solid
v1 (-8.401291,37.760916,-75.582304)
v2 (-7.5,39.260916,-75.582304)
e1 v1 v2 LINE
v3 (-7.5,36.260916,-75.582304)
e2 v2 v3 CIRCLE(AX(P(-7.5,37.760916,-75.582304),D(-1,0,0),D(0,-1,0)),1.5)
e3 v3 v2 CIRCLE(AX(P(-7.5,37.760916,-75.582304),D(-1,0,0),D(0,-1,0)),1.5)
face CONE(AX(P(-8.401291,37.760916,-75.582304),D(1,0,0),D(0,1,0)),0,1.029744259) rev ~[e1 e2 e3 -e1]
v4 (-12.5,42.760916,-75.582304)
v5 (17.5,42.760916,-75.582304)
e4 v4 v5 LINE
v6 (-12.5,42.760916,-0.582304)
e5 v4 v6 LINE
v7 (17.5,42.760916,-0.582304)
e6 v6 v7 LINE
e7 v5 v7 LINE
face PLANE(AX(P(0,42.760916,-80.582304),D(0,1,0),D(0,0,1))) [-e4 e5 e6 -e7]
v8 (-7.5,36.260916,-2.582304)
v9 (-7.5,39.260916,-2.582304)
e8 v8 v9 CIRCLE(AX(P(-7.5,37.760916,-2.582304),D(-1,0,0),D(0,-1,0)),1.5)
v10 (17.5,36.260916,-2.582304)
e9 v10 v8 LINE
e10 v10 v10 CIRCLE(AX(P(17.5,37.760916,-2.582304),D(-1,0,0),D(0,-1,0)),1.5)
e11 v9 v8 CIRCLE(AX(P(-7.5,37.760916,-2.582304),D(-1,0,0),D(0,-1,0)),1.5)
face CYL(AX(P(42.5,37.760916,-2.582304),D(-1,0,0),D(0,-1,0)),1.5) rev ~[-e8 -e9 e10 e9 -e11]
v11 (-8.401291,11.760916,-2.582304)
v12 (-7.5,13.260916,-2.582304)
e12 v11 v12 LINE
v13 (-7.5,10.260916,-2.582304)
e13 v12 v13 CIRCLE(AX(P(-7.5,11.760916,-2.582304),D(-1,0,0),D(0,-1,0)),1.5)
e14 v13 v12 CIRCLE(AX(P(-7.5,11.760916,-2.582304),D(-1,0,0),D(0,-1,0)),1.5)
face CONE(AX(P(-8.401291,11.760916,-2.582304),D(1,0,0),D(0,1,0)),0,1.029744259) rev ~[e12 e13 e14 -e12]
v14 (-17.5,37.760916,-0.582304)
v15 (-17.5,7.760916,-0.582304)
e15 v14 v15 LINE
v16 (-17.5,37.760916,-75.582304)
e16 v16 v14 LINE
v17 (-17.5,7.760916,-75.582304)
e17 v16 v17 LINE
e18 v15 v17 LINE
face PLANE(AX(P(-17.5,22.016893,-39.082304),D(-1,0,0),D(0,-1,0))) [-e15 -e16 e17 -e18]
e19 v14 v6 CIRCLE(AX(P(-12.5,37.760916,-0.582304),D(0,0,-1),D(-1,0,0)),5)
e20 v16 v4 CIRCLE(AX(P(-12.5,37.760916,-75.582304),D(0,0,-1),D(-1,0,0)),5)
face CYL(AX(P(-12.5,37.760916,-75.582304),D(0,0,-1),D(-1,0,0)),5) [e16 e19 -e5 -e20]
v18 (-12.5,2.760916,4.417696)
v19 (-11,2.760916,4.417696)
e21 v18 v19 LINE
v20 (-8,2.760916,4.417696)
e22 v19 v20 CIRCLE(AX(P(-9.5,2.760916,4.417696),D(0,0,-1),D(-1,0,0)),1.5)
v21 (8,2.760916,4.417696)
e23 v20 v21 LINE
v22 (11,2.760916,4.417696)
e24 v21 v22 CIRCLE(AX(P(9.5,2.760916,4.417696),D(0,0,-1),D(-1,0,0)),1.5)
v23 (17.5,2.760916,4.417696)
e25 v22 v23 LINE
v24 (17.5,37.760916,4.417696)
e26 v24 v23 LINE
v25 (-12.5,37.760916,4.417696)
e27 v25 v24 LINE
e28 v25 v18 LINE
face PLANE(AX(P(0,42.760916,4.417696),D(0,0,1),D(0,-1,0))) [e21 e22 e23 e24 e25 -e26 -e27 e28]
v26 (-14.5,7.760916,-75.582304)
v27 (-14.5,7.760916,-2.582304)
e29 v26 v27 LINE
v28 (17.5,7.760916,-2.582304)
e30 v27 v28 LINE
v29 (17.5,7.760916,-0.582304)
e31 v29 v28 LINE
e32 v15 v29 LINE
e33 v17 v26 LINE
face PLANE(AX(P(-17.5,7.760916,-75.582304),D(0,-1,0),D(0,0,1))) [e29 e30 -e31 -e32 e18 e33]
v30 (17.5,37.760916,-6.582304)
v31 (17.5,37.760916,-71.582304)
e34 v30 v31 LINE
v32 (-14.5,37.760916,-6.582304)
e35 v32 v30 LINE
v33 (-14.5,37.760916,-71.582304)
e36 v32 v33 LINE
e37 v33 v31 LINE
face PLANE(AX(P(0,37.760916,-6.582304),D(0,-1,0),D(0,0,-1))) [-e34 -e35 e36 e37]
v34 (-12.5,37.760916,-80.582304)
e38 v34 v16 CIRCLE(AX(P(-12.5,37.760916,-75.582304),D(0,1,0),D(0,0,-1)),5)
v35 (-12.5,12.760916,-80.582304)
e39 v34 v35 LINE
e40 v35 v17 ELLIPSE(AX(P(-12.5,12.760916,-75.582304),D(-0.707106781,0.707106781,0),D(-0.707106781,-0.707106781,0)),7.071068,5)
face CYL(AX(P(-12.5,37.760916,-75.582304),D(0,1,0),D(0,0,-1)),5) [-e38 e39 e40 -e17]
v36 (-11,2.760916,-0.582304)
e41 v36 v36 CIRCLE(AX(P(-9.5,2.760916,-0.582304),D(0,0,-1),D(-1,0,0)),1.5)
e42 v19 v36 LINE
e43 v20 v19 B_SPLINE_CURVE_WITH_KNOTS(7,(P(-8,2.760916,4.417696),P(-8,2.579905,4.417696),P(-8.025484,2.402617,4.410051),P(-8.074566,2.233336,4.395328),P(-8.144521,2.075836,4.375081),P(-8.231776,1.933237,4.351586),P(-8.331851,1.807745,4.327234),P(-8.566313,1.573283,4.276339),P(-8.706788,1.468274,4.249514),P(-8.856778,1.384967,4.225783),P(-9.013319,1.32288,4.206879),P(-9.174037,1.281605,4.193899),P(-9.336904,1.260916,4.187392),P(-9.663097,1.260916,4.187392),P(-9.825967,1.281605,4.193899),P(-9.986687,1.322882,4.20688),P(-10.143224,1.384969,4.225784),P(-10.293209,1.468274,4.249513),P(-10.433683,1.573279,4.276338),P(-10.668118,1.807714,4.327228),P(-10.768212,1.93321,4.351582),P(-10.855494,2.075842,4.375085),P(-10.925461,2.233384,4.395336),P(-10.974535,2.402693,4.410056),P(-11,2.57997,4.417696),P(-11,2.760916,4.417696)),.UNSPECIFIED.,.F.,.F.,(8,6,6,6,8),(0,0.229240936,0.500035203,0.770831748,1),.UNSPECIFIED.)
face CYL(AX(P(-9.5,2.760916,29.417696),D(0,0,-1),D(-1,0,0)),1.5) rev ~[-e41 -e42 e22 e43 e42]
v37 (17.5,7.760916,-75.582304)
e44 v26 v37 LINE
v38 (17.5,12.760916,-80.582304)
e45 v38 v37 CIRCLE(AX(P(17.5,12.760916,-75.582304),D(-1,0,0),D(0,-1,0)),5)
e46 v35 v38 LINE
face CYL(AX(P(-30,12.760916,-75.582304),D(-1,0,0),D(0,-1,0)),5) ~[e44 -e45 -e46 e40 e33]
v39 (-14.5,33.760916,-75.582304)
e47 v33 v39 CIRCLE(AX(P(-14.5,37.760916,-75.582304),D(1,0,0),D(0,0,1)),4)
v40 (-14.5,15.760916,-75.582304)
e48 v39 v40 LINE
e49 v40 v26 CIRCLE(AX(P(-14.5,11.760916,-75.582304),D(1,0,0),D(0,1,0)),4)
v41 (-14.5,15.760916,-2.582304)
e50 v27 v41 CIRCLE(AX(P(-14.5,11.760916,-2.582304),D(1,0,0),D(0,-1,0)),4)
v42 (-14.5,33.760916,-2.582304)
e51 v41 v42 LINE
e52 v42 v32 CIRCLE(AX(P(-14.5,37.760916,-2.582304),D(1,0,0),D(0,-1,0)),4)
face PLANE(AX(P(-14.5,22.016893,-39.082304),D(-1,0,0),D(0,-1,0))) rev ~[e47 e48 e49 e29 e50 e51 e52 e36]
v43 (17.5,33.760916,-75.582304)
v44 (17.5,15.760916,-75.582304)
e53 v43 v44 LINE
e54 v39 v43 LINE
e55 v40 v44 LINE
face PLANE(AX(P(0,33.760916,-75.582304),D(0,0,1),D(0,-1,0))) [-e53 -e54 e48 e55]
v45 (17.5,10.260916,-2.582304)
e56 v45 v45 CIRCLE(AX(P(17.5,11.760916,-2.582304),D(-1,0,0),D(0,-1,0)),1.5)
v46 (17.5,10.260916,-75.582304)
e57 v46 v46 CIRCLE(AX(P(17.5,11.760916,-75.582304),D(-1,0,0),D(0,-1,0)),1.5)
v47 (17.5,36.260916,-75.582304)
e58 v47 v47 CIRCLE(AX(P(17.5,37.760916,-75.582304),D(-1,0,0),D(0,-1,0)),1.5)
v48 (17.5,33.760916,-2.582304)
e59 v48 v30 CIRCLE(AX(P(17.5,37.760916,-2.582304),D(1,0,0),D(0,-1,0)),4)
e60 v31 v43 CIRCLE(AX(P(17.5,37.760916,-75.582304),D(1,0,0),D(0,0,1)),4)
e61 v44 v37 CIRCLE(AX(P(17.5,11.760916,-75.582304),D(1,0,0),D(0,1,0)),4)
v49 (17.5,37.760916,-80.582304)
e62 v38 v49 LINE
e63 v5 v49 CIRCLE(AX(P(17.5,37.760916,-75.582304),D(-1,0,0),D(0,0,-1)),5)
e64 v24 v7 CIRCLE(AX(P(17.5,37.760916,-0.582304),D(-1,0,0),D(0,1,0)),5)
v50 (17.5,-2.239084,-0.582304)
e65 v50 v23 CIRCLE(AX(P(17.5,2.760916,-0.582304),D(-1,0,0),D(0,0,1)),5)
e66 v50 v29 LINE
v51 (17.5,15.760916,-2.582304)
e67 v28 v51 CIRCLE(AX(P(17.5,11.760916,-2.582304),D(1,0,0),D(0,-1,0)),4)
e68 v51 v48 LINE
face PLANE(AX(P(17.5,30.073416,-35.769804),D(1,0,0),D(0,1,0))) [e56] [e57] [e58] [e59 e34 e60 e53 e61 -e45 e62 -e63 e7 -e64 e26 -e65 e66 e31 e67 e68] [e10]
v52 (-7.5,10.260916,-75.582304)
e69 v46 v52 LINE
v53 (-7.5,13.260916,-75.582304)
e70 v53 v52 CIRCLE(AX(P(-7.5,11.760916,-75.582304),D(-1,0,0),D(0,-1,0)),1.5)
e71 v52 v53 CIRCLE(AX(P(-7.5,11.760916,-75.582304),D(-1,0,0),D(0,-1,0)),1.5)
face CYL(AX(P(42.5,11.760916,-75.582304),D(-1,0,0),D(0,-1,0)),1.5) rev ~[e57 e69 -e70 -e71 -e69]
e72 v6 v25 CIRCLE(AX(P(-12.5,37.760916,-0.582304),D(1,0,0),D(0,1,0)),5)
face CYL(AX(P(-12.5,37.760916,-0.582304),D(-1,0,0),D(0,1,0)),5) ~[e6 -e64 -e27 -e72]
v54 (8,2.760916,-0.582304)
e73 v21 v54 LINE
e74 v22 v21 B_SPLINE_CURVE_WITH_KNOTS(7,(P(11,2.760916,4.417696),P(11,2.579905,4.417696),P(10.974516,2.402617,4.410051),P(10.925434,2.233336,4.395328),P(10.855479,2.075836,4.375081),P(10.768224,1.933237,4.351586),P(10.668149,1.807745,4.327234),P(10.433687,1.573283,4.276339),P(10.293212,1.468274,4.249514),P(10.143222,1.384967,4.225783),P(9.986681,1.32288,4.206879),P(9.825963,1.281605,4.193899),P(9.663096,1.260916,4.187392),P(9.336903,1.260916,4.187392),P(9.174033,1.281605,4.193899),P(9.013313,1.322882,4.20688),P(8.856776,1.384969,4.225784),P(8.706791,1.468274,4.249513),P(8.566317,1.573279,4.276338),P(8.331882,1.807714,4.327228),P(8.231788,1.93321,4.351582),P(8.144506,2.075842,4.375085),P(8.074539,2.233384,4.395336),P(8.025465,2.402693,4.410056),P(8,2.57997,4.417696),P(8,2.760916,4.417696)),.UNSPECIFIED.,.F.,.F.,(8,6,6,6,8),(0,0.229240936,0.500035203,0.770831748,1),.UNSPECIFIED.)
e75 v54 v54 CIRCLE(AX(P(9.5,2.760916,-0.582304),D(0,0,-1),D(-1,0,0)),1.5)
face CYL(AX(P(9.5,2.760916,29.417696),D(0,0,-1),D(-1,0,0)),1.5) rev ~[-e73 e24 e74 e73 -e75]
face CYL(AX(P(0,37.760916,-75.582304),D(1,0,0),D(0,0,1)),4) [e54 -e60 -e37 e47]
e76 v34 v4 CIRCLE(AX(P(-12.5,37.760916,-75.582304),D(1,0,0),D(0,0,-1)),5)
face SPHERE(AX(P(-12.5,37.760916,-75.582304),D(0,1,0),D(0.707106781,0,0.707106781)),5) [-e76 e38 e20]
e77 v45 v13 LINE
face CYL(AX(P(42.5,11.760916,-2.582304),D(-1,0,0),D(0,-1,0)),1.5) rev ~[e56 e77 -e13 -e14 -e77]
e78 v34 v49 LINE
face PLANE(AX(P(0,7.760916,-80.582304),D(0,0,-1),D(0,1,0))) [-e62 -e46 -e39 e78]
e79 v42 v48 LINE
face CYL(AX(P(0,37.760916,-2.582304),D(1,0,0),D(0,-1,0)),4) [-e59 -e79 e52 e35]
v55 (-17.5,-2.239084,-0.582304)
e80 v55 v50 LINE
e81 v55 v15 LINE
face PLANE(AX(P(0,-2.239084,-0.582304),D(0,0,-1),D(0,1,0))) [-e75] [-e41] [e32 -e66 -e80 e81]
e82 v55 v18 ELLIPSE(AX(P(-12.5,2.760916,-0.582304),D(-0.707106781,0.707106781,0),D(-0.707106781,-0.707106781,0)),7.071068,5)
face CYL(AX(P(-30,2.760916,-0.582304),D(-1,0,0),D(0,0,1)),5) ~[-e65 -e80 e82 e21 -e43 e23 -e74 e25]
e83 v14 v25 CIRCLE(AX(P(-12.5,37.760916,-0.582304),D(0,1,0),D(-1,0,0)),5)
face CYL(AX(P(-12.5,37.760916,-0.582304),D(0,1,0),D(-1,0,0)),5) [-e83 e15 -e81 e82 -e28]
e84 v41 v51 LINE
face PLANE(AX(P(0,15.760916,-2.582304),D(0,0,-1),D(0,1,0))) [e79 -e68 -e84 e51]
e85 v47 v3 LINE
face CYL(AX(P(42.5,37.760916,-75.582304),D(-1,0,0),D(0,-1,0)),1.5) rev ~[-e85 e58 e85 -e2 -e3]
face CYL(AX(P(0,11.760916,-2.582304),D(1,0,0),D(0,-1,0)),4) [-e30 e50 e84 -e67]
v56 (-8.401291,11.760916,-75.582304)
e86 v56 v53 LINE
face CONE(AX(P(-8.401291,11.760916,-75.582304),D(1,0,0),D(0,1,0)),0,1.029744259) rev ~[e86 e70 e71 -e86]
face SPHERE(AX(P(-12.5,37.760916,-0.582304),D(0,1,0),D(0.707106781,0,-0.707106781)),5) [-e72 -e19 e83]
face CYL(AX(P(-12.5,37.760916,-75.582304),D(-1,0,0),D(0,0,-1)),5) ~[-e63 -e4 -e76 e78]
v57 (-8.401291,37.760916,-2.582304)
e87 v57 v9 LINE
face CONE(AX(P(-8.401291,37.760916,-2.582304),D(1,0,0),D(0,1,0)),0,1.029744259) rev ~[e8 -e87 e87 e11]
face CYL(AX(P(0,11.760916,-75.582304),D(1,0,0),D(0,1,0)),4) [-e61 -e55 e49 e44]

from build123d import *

# Parameters (mm, degrees)
F1_DEPTH     = 17.5
F3_DEPTH     = 3
F5_D         = 3
F5_DEPTH     = 25
F5_TIP       = 0.9012909285
F7_D         = 3
F7_DEPTH     = 25
F7_TIP       = 0.9012909285
F8_T1_DEPTH  = 60
F8_T3_DEPTH  = 42.5
F8_T5_DEPTH  = 75
F8_T7_DEPTH  = 42.5
F8_T9_DEPTH  = 52.5
F8_S13_W     = 5
F8_S13_H     = 5
F8_T14_DEPTH = 5
F8_S19_W     = 5
F8_S19_H     = 5
F8_T20_DEPTH = 5


# Not quite as in the source:
# - a fillet or chamfer that OpenCascade refuses, or shapes differently, is made with other operations: its cross-section is extruded or revolved along the edge and cut away or added


with BuildPart() as f1:
    # F0 (on Right) → F1 (new body, symmetric)
    with BuildSketch(Plane.YZ):
        Polygon((-2.2390836586, 4.4176964641), (-2.2390836586, -0.5823035359), (7.7609163414, -0.5823035359), (7.7609163414, -2.5823035359), (15.7609163414, -2.5823035359), (33.7609163414, -2.5823035359), (37.7609163414, -2.5823035359), (37.7609163414, -6.5823035359), (37.7609163414, -71.5823035359), (37.7609163414, -75.5823035359), (33.7609163414, -75.5823035359), (15.7609163414, -75.5823035359), (7.7609163414, -75.5823035359), (7.7609163414, -80.5823035359), (42.7609163414, -80.5823035359), (42.7609163414, 4.4176964641), align=None)
        with BuildLine():
            Line((15.7609163414, -2.5823035359), (7.7609163414, -2.5823035359))
            ThreePointArc((7.7609163414, -2.5823035359), (11.7609163414, -6.5823035359), (15.7609163414, -2.5823035359))
        make_face()
        with BuildLine():
            Line((37.7609163414, -2.5823035359), (33.7609163414, -2.5823035359))
            ThreePointArc((33.7609163414, -2.5823035359), (34.9324892166, -5.4107306607), (37.7609163414, -6.5823035359))
            Line((37.7609163414, -6.5823035359), (37.7609163414, -2.5823035359))
        make_face()
        with BuildLine():
            ThreePointArc((15.7609163414, -75.5823035359), (11.7609163414, -71.5823035359), (7.7609163414, -75.5823035359))
            Line((7.7609163414, -75.5823035359), (15.7609163414, -75.5823035359))
        make_face()
        with BuildLine():
            Line((37.7609163414, -75.5823035359), (37.7609163414, -71.5823035359))
            ThreePointArc((37.7609163414, -71.5823035359), (34.9324892166, -72.7538764112), (33.7609163414, -75.5823035359))
            Line((33.7609163414, -75.5823035359), (37.7609163414, -75.5823035359))
        make_face()
    extrude(amount=F1_DEPTH, both=True)

    # F2 (on face) → F3 (join)
    with BuildSketch(Plane(origin=(-17.5, 0, 0), x_dir=(0, -1, 0), z_dir=(-1, 0, 0))):
        with BuildLine():
            Line((-7.7609163414, -75.5823035359), (-7.7609163414, -2.5823035359))
            ThreePointArc((-7.7609163414, -2.5823035359), (-11.7609163414, -6.5823035359), (-15.7609163414, -2.5823035359))
            Line((-15.7609163414, -2.5823035359), (-33.7609163414, -2.5823035359))
            ThreePointArc((-33.7609163414, -2.5823035359), (-34.9324892166, -5.4107306607), (-37.7609163414, -6.5823035359))
            Line((-37.7609163414, -6.5823035359), (-37.7609163414, -71.5823035359))
            ThreePointArc((-37.7609163414, -71.5823035359), (-34.9324892166, -72.7538764112), (-33.7609163414, -75.5823035359))
            Line((-33.7609163414, -75.5823035359), (-15.7609163414, -75.5823035359))
            ThreePointArc((-15.7609163414, -75.5823035359), (-11.7609163414, -71.5823035359), (-7.7609163414, -75.5823035359))
        make_face()
    extrude(amount=-F3_DEPTH)

    # F5
    with Locations(Plane.YZ.offset(17.5)):
        with Locations((11.7609163414, -2.5823035359), (37.7609163414, -2.5823035359), (37.7609163414, -75.5823035359), (11.7609163414, -75.5823035359)):
            Hole(F5_D / 2, depth=F5_DEPTH)
            with Locations((0, 0, -(F5_DEPTH + F5_TIP / 2))):  # 118° drill point
                Cone(0, F5_D / 2, F5_TIP, mode=Mode.SUBTRACT)

    # F7
    with Locations(Plane.XY.offset(4.4176964641)):
        with Locations((-9.5, 2.7609163414), (9.5, 2.7609163414)):
            Hole(F7_D / 2, depth=F7_DEPTH)
            with Locations((0, 0, -(F7_DEPTH + F7_TIP / 2))):  # 118° drill point
                Cone(0, F7_D / 2, F7_TIP, mode=Mode.SUBTRACT)

    # F8: fillet of radius 5 on 7 edges, made by hand

    # F8_s2 → F8_t1 (cut)
    with BuildSketch(Plane.YZ.offset(-30)):
        with BuildLine():
            ThreePointArc((2.7609163414, 4.4176964641), (-0.7746175645, 2.95323037), (-2.2390836586, -0.5823035359))
            Line((-2.2390836586, -0.5823035359), (-2.2390836586, 4.4176964641))
            Line((-2.2390836586, 4.4176964641), (2.7609163414, 4.4176964641))
        make_face()
        with BuildLine():
            ThreePointArc((7.7609163414, -75.5823035359), (9.2253824355, -79.1178374419), (12.7609163414, -80.5823035359))
            Line((12.7609163414, -80.5823035359), (7.7609163414, -80.5823035359))
            Line((7.7609163414, -80.5823035359), (7.7609163414, -75.5823035359))
        make_face()
    extrude(amount=F8_T1_DEPTH, mode=Mode.SUBTRACT)

    # F8_s4 → F8_t3 (cut)
    with BuildSketch(Plane.YZ.offset(-12.5)):
        with BuildLine():
            ThreePointArc((42.7609163414, -0.5823035359), (41.2964502473, 2.95323037), (37.7609163414, 4.4176964641))
            Line((37.7609163414, 4.4176964641), (42.7609163414, 4.4176964641))
            Line((42.7609163414, 4.4176964641), (42.7609163414, -0.5823035359))
        make_face()
        with BuildLine():
            ThreePointArc((37.7609163414, -80.5823035359), (41.2964502473, -79.1178374419), (42.7609163414, -75.5823035359))
            Line((42.7609163414, -75.5823035359), (42.7609163414, -80.5823035359))
            Line((42.7609163414, -80.5823035359), (37.7609163414, -80.5823035359))
        make_face()
    extrude(amount=F8_T3_DEPTH, mode=Mode.SUBTRACT)

    # F8_s6 → F8_t5 (cut)
    with BuildSketch(Plane.XY.offset(-75.5823035359)):
        with BuildLine():
            ThreePointArc((-17.5, 37.7609163414), (-16.0355339059, 41.2964502473), (-12.5, 42.7609163414))
            Line((-12.5, 42.7609163414), (-17.5, 42.7609163414))
            Line((-17.5, 42.7609163414), (-17.5, 37.7609163414))
        make_face()
    extrude(amount=F8_T5_DEPTH, mode=Mode.SUBTRACT)

    # F8_s8 → F8_t7 (cut)
    with BuildSketch(Plane.XZ.offset(-37.7609163414)):
        with BuildLine():
            ThreePointArc((-12.5, -80.5823035359), (-16.0355339059, -79.1178374419), (-17.5, -75.5823035359))
            Line((-17.5, -75.5823035359), (-17.5, -80.5823035359))
            Line((-17.5, -80.5823035359), (-12.5, -80.5823035359))
        make_face()
    extrude(amount=F8_T7_DEPTH, mode=Mode.SUBTRACT)

    # F8_s10 → F8_t9 (cut)
    with BuildSketch(Plane.XZ.offset(-37.7609163414)):
        with BuildLine():
            ThreePointArc((-17.5, -0.5823035359), (-16.0355339059, 2.95323037), (-12.5, 4.4176964641))
            Line((-12.5, 4.4176964641), (-17.5, 4.4176964641))
            Line((-17.5, 4.4176964641), (-17.5, -0.5823035359))
        make_face()
    extrude(amount=F8_T9_DEPTH, mode=Mode.SUBTRACT)


with BuildPart() as f8_tool12:
    # F8_s13 → F8_t14 (new body)
    with BuildSketch(Plane.XZ.offset(-37.7609163414)):
        with Locations((-15, 1.9176964641)):
            Rectangle(F8_S13_W, F8_S13_H)
    extrude(amount=-F8_T14_DEPTH)

    # F8_s15 → F8_t16 (revolve, cut)
    with BuildSketch(Plane(origin=(-12.5, 37.7609163414, -0.5823035359), x_dir=(0.7071067812, 0, -0.7071067812), z_dir=(0.7071067812, 0, 0.7071067812))):
        with BuildLine():
            ThreePointArc((0, -5), (5, 0), (0, 5))
            Line((0, 5), (0, -5))
        make_face()
    revolve(axis=Axis((-12.5, 37.7609163414, -0.5823035359), (0, 1, 0)), mode=Mode.SUBTRACT)


with BuildPart() as f1_1:
    add(f1.part)

    # F8_t11: cut F8_tool12
    add(f8_tool12.part, mode=Mode.SUBTRACT)


with BuildPart() as f8_tool18:
    # F8_s19 → F8_t20 (new body)
    with BuildSketch(Plane.XZ.offset(-37.7609163414)):
        with Locations((-15, -78.0823035359)):
            Rectangle(F8_S19_W, F8_S19_H)
    extrude(amount=-F8_T20_DEPTH)

    # F8_s21 → F8_t22 (revolve, cut)
    with BuildSketch(Plane(origin=(-12.5, 37.7609163414, -75.5823035359), x_dir=(0.7071067812, 0, 0.7071067812), z_dir=(-0.7071067812, 0, 0.7071067812))):
        with BuildLine():
            ThreePointArc((0, -5), (5, 0), (0, 5))
            Line((0, 5), (0, -5))
        make_face()
    revolve(axis=Axis((-12.5, 37.7609163414, -75.5823035359), (0, 1, 0)), mode=Mode.SUBTRACT)


with BuildPart() as f1_2:
    add(f1_1.part)

    # F8_t17: cut F8_tool18
    add(f8_tool18.part, mode=Mode.SUBTRACT)


solid = f1_2.part
